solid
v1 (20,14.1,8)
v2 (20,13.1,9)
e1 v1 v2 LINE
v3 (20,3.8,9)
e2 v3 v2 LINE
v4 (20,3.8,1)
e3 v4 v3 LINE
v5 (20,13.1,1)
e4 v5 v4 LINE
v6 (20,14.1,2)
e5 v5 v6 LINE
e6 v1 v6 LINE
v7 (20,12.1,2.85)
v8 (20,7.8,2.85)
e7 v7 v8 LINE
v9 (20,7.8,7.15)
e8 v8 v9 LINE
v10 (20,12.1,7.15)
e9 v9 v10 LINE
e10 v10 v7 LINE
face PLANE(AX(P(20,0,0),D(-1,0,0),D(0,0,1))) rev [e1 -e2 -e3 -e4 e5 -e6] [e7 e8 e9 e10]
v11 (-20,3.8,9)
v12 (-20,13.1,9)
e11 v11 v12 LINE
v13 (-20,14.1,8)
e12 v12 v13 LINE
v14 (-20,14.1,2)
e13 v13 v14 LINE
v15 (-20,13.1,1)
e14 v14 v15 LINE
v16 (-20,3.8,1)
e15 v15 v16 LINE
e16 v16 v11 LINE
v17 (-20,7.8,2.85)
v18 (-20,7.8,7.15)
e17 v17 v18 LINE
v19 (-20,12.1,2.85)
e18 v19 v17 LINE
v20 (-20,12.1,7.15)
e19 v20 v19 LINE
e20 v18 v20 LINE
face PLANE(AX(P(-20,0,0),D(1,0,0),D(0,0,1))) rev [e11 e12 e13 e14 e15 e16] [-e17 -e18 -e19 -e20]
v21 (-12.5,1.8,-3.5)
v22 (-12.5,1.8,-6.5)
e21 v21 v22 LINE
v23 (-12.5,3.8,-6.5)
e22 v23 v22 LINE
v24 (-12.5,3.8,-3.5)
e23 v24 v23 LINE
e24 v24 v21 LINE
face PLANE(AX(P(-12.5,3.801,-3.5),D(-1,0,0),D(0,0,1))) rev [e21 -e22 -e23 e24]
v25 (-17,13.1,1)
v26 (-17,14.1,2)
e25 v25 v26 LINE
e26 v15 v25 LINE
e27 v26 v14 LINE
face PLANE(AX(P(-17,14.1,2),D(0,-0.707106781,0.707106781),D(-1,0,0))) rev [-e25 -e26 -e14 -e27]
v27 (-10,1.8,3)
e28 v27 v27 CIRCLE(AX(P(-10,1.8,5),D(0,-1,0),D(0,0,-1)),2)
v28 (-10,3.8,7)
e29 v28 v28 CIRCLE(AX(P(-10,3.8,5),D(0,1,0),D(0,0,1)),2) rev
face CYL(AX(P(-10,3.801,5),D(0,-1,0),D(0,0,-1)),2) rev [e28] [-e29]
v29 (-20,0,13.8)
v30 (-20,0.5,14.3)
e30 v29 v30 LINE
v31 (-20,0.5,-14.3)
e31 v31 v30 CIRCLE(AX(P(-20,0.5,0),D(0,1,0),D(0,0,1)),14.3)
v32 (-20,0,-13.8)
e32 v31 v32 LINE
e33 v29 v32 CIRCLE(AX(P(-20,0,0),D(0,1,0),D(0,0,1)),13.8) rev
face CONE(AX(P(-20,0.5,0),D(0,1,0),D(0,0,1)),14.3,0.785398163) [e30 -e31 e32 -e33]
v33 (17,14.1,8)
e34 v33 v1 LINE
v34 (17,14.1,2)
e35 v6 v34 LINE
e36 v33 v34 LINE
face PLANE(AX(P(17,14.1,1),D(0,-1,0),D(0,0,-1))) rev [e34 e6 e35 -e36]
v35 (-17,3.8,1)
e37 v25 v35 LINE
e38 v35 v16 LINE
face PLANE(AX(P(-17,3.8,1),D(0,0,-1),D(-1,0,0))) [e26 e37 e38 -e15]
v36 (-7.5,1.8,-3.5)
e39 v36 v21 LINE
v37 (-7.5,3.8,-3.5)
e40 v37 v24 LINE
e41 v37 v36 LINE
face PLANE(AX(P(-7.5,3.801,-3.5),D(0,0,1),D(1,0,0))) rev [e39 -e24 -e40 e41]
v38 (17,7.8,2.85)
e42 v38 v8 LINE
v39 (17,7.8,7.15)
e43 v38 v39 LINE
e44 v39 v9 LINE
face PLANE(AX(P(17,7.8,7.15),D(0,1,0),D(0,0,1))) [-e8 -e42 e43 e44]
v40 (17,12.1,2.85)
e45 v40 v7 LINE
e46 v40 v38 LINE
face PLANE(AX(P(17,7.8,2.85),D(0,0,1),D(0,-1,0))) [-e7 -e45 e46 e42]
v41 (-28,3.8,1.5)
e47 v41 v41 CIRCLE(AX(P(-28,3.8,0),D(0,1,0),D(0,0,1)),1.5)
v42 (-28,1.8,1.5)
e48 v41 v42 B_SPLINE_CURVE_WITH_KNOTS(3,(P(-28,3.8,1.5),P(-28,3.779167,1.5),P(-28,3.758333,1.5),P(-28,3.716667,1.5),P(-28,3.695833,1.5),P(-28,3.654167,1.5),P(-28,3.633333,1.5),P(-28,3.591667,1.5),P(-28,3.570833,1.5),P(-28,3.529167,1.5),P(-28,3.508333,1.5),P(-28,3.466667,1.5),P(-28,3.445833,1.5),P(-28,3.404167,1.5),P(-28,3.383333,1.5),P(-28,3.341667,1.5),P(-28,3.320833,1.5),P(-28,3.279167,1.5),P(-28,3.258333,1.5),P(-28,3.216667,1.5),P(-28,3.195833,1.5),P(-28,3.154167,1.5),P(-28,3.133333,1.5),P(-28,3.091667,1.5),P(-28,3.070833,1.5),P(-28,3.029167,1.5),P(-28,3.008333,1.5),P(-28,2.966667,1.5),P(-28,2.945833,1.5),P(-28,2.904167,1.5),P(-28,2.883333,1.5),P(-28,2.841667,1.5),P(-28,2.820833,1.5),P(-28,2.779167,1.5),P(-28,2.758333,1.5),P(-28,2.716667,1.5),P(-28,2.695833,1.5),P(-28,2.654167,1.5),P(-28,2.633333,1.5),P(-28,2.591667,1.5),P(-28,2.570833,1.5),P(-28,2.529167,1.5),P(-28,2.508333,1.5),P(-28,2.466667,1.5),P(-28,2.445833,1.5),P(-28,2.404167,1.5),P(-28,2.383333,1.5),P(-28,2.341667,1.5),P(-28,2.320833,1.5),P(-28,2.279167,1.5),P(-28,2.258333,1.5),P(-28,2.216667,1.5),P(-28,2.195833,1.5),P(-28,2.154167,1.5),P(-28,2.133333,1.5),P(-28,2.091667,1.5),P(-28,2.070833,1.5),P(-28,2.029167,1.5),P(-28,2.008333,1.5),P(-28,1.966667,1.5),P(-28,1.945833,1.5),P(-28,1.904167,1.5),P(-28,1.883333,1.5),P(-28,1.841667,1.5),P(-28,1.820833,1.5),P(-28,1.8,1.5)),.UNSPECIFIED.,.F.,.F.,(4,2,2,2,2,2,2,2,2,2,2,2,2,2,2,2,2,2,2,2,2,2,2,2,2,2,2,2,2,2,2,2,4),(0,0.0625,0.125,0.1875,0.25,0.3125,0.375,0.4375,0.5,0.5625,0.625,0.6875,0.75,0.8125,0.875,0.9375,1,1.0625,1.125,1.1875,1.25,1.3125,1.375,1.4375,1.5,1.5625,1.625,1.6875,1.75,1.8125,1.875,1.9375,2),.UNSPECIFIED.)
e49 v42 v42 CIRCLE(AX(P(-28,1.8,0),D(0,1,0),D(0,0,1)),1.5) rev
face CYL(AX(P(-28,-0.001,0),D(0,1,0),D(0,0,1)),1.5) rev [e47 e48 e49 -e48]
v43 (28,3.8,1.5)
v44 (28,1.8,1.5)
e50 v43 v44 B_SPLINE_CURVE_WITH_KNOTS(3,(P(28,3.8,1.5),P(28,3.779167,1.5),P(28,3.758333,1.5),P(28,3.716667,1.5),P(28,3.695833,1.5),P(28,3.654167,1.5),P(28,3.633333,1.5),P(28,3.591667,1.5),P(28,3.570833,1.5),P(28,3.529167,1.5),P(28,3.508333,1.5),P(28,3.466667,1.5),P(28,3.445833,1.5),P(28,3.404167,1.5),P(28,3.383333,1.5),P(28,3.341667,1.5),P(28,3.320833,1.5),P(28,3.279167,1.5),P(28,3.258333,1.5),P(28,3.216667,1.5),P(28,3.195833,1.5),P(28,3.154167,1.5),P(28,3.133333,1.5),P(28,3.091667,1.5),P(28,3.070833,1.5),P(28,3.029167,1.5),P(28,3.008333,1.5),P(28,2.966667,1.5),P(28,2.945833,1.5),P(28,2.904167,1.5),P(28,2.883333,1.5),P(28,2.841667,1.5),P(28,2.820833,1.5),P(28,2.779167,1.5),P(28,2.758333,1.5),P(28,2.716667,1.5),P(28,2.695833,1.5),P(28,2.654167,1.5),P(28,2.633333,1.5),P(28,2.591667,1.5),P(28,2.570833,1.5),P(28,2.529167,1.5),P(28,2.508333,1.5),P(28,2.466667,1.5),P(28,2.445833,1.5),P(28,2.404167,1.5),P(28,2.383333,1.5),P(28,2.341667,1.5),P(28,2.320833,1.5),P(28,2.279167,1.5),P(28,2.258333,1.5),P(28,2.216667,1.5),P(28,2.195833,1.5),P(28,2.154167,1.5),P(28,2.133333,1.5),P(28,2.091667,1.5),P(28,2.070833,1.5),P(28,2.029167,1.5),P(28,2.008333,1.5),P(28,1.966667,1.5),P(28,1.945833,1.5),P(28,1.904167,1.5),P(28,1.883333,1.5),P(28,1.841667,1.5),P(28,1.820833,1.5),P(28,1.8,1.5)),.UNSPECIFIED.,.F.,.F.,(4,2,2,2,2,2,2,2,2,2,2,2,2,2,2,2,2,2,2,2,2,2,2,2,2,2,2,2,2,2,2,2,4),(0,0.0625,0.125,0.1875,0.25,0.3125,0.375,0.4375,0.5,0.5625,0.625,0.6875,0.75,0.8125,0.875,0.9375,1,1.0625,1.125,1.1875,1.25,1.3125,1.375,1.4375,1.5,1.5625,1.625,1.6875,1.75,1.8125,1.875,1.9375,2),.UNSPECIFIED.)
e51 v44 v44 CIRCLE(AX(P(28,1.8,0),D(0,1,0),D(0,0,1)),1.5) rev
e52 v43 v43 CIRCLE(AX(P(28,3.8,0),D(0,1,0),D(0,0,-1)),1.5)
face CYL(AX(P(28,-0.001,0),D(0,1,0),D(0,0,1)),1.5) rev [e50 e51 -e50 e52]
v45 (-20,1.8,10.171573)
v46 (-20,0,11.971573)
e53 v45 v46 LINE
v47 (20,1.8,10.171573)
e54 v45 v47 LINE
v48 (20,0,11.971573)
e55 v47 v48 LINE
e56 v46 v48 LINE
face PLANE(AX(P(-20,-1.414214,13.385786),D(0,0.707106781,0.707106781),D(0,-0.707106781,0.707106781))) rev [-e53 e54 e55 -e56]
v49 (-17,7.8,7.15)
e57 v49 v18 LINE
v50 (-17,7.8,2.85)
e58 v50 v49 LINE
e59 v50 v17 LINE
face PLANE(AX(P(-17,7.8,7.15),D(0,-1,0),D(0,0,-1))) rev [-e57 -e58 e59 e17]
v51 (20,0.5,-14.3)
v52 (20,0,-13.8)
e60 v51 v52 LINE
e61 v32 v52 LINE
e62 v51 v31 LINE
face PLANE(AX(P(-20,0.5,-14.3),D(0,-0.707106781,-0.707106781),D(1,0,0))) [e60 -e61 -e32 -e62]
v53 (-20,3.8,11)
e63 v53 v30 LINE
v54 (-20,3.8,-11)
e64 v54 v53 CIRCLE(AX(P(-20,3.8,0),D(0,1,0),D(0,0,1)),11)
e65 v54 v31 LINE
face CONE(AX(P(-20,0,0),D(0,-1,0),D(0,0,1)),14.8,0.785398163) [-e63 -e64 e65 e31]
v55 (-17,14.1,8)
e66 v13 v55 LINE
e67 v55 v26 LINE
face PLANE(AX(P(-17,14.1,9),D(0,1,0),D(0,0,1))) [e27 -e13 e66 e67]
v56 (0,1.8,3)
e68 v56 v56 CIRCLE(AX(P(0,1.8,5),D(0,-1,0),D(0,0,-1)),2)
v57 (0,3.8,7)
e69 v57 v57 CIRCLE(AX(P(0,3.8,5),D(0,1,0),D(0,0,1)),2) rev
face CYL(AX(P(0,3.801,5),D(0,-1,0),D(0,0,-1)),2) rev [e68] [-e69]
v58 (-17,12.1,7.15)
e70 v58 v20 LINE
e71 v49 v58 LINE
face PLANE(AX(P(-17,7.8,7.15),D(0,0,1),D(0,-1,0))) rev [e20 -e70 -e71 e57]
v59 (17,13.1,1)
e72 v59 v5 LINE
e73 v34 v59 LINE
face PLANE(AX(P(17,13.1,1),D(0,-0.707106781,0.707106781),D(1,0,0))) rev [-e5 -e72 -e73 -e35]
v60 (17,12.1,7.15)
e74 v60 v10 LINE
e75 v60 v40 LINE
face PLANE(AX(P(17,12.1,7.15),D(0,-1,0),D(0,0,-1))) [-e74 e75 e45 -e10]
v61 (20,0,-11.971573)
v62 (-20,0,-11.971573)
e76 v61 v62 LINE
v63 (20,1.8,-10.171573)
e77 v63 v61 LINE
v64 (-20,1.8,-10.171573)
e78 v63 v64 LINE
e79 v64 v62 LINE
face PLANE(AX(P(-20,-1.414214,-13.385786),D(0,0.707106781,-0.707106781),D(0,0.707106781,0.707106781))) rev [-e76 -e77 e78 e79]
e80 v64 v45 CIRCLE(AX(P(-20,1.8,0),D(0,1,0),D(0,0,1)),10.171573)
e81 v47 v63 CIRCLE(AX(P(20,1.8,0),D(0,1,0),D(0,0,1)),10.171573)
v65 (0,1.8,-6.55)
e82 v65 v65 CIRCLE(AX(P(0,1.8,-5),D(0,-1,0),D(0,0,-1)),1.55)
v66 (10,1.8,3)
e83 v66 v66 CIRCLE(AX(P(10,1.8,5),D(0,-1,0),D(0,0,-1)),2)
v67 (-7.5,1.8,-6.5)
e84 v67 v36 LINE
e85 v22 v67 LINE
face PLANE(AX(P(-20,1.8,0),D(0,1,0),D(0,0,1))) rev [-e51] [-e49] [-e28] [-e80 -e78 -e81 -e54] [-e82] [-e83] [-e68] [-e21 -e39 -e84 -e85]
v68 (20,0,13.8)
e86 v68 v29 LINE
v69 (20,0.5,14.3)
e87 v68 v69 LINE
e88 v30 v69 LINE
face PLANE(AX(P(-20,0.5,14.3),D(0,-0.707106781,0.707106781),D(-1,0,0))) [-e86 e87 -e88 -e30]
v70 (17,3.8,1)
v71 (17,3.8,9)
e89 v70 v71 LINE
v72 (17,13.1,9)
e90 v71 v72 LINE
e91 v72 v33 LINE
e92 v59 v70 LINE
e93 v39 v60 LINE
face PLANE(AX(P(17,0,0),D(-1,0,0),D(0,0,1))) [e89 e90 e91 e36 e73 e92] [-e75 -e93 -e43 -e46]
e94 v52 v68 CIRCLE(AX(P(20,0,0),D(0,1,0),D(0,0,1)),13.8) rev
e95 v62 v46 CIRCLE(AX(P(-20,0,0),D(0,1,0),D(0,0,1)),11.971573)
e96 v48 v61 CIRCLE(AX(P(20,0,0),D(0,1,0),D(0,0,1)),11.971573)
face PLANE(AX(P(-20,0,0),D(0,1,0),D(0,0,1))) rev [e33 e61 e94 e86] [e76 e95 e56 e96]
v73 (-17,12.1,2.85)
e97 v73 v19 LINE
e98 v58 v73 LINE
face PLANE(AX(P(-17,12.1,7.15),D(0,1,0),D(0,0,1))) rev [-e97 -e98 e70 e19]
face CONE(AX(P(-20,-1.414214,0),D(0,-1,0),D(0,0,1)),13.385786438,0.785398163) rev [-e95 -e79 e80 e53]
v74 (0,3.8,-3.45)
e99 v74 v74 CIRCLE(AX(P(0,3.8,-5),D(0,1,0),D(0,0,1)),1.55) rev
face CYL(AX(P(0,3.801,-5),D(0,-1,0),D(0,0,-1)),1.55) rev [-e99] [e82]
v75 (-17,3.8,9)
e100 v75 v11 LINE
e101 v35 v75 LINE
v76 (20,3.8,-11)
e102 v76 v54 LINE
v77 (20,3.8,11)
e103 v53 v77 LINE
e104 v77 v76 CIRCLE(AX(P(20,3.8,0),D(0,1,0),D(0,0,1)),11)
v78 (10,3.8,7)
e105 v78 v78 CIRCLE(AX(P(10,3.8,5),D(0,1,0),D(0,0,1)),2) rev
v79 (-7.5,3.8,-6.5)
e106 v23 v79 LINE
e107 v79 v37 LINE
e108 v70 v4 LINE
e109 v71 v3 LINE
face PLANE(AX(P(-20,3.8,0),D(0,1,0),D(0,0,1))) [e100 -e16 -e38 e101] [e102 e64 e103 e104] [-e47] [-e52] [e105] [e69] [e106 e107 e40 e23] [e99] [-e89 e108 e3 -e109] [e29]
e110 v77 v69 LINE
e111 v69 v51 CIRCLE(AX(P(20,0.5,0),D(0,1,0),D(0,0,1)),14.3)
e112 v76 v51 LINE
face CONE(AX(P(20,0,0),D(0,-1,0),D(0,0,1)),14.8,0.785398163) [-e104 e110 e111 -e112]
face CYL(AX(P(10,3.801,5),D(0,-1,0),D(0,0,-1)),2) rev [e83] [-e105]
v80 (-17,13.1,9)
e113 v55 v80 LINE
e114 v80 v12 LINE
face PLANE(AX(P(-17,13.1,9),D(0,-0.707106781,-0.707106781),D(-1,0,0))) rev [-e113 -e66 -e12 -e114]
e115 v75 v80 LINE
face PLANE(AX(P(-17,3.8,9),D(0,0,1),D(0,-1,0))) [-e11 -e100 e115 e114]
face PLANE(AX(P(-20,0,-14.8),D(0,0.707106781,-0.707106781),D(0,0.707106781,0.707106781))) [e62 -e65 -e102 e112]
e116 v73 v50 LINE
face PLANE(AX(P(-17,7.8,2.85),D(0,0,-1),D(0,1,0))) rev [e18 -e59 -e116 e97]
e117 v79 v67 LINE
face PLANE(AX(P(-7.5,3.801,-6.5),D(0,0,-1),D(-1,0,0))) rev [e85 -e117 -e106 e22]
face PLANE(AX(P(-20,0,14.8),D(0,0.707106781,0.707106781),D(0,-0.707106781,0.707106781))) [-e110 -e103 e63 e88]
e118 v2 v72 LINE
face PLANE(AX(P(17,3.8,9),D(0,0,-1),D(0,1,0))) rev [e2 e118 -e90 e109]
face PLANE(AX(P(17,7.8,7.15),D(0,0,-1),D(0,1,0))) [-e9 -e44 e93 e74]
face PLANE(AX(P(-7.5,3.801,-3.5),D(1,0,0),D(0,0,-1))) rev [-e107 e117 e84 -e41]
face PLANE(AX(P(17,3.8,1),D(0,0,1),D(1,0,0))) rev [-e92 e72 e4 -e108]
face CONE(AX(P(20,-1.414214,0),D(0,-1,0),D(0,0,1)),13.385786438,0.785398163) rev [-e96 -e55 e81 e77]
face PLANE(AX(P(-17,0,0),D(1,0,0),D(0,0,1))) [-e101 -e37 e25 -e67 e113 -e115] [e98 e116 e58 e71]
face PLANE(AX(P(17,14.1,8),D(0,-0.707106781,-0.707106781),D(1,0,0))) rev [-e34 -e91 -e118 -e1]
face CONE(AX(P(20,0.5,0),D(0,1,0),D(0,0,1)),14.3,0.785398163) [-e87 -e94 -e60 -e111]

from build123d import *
from OCP.BRepFilletAPI import BRepFilletAPI_MakeChamfer

# Parameters (mm, degrees)
BOSS_EXTRU_1_DEPTH           = 3.8
BOSS_EXTRU_1_TAPER           = 45
COQUE2_DEPTH                 = 1.8
COQUE2_DRAFT                 = 45
CHANFREIN1_SIZE              = 1
CHANFREIN1_SIZE2             = 0.707106781
ENL_V_MAT_EXTRU_1_REACH      = 39.355
ESQUISSE2_R                  = 1.5
ENL_V_MAT_EXTRU_2_REACH      = 39.215
ESQUISSE3_R                  = 1.55
ESQUISSE3_R_2                = 2
ESQUISSE3_W                  = 5
ESQUISSE3_H                  = 3
ESQUISSE4_W                  = 4.3
ESQUISSE4_H                  = 4.3
BOSS_EXTRU_2_DEPTH           = 3
CHANFREIN2_SIZE              = 1
CHANFREIN2_OF_SYM_TRIE1_SIZE = 1


# Read off the part's stored shape, not the designer's step: Coque2
with BuildPart() as part:
    # Esquisse1 → Boss.-Extru.1 (new body)
    with BuildSketch(Plane(origin=(0, 0, 0), x_dir=(1, 0, 0), z_dir=(0, 1, 0))):
        with BuildLine():
            ThreePointArc((-20, 14.8), (-34.8, 0), (-20, -14.8))
            Line((-20, -14.8), (20, -14.8))
            ThreePointArc((20, -14.8), (34.8, 0), (20, 14.8))
            Line((20, 14.8), (-20, 14.8))
        make_face()
    extrude(amount=BOSS_EXTRU_1_DEPTH, taper=BOSS_EXTRU_1_TAPER)


with BuildPart() as coque2_tool:
    # Coque2 outline → Coque2 (with draft: the straight prism first)
    with BuildSketch(Plane(origin=(0, 1.8, 0), x_dir=(1, 0, 0), z_dir=(0, 1, 0))):
        with BuildLine():
            Line((-20, -10.171572875), (20, -10.171572875))
            ThreePointArc((20, -10.171572875), (30.171572875, 0), (20, 10.171572875))
            Line((20, 10.171572875), (-20, 10.171572875))
            ThreePointArc((-20, 10.171572875), (-30.171572875, 0), (-20, -10.171572875))
        make_face()
    extrude(amount=-COQUE2_DEPTH)
    # Coque2: the draft: its side faces are tilted about the plane it starts from
    coque2_sides = [coque2_tool.faces().sort_by_distance(p)[0] for p in [
        (0, 0.9, 10.171572875),
        (30.171572875, 0.9, 0),
        (0, 0.9, -10.171572875),
        (-30.171572875, 0.9, 0),
    ]]
    draft(coque2_sides, Plane(origin=(0, 1.8, 0), x_dir=(1, 0, 0), z_dir=(0, 1, 0)), COQUE2_DRAFT)


with BuildPart() as part_1:
    add(part.part)

    # Coque2: cut by coque2_tool
    add(coque2_tool.part, mode=Mode.SUBTRACT)

    # Chanfrein1: one chamfer whose edges measure the first distance from different faces: ONE call of the kernel's chamfer builder (chamfer() names one face for all edges)
    chanfrein1_edges_1 = [part_1.edges().sort_by_distance(p)[0] for p in [
        (0, 0, -14.8),
        (0, 0, 14.8),
        (-34.8, 0, 0),
    ]]
    chanfrein1_side_1 = [part_1.faces().sort_by_distance(p)[0] for p in [
        (0, 0, -14.043672029),
    ]]
    chanfrein1_edges_2 = [part_1.edges().sort_by_distance(p)[0] for p in [
        (34.8, 0, 0),
    ]]
    chanfrein1_side_2 = [part_1.faces().sort_by_distance(p)[0] for p in [
        (32.9, 1.9, 0),
    ]]
    chanfrein1 = BRepFilletAPI_MakeChamfer(part_1.part.solid().wrapped)
    for e in chanfrein1_edges_1:
        chanfrein1.Add(CHANFREIN1_SIZE, CHANFREIN1_SIZE2, e.wrapped, chanfrein1_side_1[0].wrapped)  # the first distance lies on this face
    for e in chanfrein1_edges_2:
        chanfrein1.Add(CHANFREIN1_SIZE, CHANFREIN1_SIZE2, e.wrapped, chanfrein1_side_2[0].wrapped)  # the first distance lies on this face
    add(Compound.cast(chanfrein1.Shape()), mode=Mode.REPLACE)

    # Esquisse2 → Enlèv. mat.-Extru.1 (cut, up to next)
    with BuildSketch(Plane(origin=(0, 3.8, 0), x_dir=(1, 0, 0), z_dir=(0, 1, 0)), mode=Mode.PRIVATE) as enl_v_mat_extru_1_sk1:
        with Locations(Location((-28, 0, 0), (0, 0, 270))):
            Circle(ESQUISSE2_R)
    enl_v_mat_extru_1_tool1 = extrude(enl_v_mat_extru_1_sk1.sketch, amount=-ENL_V_MAT_EXTRU_1_REACH, mode=Mode.PRIVATE) & part_1.part
    # Esquisse2 → Enlèv. mat.-Extru.1 (cut, up to next)
    with BuildSketch(Plane(origin=(0, 3.8, 0), x_dir=(1, 0, 0), z_dir=(0, 1, 0)), mode=Mode.PRIVATE) as enl_v_mat_extru_1_sk2:
        with Locations(Location((28, 0, 0), (0, 0, 270))):
            Circle(ESQUISSE2_R)
    enl_v_mat_extru_1_tool2 = extrude(enl_v_mat_extru_1_sk2.sketch, amount=-ENL_V_MAT_EXTRU_1_REACH, mode=Mode.PRIVATE) & part_1.part
    add(enl_v_mat_extru_1_tool1.solids().sort_by_distance((-28, 3.8, 0))[0], mode=Mode.SUBTRACT)
    add(enl_v_mat_extru_1_tool2.solids().sort_by_distance((28, 3.8, 0))[0], mode=Mode.SUBTRACT)

    # Esquisse3 → Enlèv. mat.-Extru.2 (cut, up to next)
    with BuildSketch(Plane.XZ.offset(-1.8), mode=Mode.PRIVATE) as enl_v_mat_extru_2_sk1:
        with Locations(Location((0, -5, 0), (0, 0, 270))):
            Circle(ESQUISSE3_R)
    enl_v_mat_extru_2_tool1 = extrude(enl_v_mat_extru_2_sk1.sketch, amount=-ENL_V_MAT_EXTRU_2_REACH, mode=Mode.PRIVATE) & part_1.part
    # Esquisse3 → Enlèv. mat.-Extru.2 (cut, up to next)
    with BuildSketch(Plane.XZ.offset(-1.8), mode=Mode.PRIVATE) as enl_v_mat_extru_2_sk2:
        with Locations(Location((10, 5, 0), (0, 0, 270))):
            Circle(ESQUISSE3_R_2)
    enl_v_mat_extru_2_tool2 = extrude(enl_v_mat_extru_2_sk2.sketch, amount=-ENL_V_MAT_EXTRU_2_REACH, mode=Mode.PRIVATE) & part_1.part
    # Esquisse3 → Enlèv. mat.-Extru.2 (cut, up to next)
    with BuildSketch(Plane.XZ.offset(-1.8), mode=Mode.PRIVATE) as enl_v_mat_extru_2_sk3:
        with Locations(Location((0, 5, 0), (0, 0, 270))):
            Circle(ESQUISSE3_R_2)
    enl_v_mat_extru_2_tool3 = extrude(enl_v_mat_extru_2_sk3.sketch, amount=-ENL_V_MAT_EXTRU_2_REACH, mode=Mode.PRIVATE) & part_1.part
    # Esquisse3 → Enlèv. mat.-Extru.2 (cut, up to next)
    with BuildSketch(Plane.XZ.offset(-1.8), mode=Mode.PRIVATE) as enl_v_mat_extru_2_sk4:
        with Locations(Location((-10, 5, 0), (0, 0, 270))):
            Circle(ESQUISSE3_R_2)
    enl_v_mat_extru_2_tool4 = extrude(enl_v_mat_extru_2_sk4.sketch, amount=-ENL_V_MAT_EXTRU_2_REACH, mode=Mode.PRIVATE) & part_1.part
    # Esquisse3 → Enlèv. mat.-Extru.2 (cut, up to next)
    with BuildSketch(Plane.XZ.offset(-1.8), mode=Mode.PRIVATE) as enl_v_mat_extru_2_sk5:
        with Locations((-10, -5)):
            Rectangle(ESQUISSE3_W, ESQUISSE3_H)
    enl_v_mat_extru_2_tool5 = extrude(enl_v_mat_extru_2_sk5.sketch, amount=-ENL_V_MAT_EXTRU_2_REACH, mode=Mode.PRIVATE) & part_1.part
    add(enl_v_mat_extru_2_tool1.solids().sort_by_distance((0, 1.8, -5))[0], mode=Mode.SUBTRACT)
    add(enl_v_mat_extru_2_tool2.solids().sort_by_distance((10, 1.8, 5))[0], mode=Mode.SUBTRACT)
    add(enl_v_mat_extru_2_tool3.solids().sort_by_distance((0, 1.8, 5))[0], mode=Mode.SUBTRACT)
    add(enl_v_mat_extru_2_tool4.solids().sort_by_distance((-10, 1.8, 5))[0], mode=Mode.SUBTRACT)
    add(enl_v_mat_extru_2_tool5.solids().sort_by_distance((-10, 1.8, -5))[0], mode=Mode.SUBTRACT)

    # Esquisse4 → Boss.-Extru.2 (add)
    with BuildSketch(Plane.ZY.offset(-20)):
        Polygon((9, 3.8), (1, 3.8), (1, 14.1), (5, 14.1), (9, 14.1), align=None)
        with Locations((5, 9.95)):
            Rectangle(ESQUISSE4_W, ESQUISSE4_H, mode=Mode.SUBTRACT)
    boss_extru_2 = extrude(amount=BOSS_EXTRU_2_DEPTH)

    # Chanfrein2
    chanfrein2_edges = [part_1.edges().sort_by_distance(p)[0] for p in [
        (18.5, 14.1, 9),
        (18.5, 14.1, 1),
    ]]
    chamfer(chanfrein2_edges, length=CHANFREIN2_SIZE)

    # Symétrie1: Boss.-Extru.2 across plane
    add(boss_extru_2.mirror(Plane(origin=(0, 0, 0), x_dir=(0, 0, 1), z_dir=(1, 0, 0))))

    # Chanfrein2 of Symétrie1
    chanfrein2_of_sym_trie1_edges = [part_1.edges().sort_by_distance(p)[0] for p in [
        (-18.5, 14.1, 9),
        (-18.5, 14.1, 1),
    ]]
    chamfer(chanfrein2_of_sym_trie1_edges, length=CHANFREIN2_OF_SYM_TRIE1_SIZE)


solid = part_1.part
